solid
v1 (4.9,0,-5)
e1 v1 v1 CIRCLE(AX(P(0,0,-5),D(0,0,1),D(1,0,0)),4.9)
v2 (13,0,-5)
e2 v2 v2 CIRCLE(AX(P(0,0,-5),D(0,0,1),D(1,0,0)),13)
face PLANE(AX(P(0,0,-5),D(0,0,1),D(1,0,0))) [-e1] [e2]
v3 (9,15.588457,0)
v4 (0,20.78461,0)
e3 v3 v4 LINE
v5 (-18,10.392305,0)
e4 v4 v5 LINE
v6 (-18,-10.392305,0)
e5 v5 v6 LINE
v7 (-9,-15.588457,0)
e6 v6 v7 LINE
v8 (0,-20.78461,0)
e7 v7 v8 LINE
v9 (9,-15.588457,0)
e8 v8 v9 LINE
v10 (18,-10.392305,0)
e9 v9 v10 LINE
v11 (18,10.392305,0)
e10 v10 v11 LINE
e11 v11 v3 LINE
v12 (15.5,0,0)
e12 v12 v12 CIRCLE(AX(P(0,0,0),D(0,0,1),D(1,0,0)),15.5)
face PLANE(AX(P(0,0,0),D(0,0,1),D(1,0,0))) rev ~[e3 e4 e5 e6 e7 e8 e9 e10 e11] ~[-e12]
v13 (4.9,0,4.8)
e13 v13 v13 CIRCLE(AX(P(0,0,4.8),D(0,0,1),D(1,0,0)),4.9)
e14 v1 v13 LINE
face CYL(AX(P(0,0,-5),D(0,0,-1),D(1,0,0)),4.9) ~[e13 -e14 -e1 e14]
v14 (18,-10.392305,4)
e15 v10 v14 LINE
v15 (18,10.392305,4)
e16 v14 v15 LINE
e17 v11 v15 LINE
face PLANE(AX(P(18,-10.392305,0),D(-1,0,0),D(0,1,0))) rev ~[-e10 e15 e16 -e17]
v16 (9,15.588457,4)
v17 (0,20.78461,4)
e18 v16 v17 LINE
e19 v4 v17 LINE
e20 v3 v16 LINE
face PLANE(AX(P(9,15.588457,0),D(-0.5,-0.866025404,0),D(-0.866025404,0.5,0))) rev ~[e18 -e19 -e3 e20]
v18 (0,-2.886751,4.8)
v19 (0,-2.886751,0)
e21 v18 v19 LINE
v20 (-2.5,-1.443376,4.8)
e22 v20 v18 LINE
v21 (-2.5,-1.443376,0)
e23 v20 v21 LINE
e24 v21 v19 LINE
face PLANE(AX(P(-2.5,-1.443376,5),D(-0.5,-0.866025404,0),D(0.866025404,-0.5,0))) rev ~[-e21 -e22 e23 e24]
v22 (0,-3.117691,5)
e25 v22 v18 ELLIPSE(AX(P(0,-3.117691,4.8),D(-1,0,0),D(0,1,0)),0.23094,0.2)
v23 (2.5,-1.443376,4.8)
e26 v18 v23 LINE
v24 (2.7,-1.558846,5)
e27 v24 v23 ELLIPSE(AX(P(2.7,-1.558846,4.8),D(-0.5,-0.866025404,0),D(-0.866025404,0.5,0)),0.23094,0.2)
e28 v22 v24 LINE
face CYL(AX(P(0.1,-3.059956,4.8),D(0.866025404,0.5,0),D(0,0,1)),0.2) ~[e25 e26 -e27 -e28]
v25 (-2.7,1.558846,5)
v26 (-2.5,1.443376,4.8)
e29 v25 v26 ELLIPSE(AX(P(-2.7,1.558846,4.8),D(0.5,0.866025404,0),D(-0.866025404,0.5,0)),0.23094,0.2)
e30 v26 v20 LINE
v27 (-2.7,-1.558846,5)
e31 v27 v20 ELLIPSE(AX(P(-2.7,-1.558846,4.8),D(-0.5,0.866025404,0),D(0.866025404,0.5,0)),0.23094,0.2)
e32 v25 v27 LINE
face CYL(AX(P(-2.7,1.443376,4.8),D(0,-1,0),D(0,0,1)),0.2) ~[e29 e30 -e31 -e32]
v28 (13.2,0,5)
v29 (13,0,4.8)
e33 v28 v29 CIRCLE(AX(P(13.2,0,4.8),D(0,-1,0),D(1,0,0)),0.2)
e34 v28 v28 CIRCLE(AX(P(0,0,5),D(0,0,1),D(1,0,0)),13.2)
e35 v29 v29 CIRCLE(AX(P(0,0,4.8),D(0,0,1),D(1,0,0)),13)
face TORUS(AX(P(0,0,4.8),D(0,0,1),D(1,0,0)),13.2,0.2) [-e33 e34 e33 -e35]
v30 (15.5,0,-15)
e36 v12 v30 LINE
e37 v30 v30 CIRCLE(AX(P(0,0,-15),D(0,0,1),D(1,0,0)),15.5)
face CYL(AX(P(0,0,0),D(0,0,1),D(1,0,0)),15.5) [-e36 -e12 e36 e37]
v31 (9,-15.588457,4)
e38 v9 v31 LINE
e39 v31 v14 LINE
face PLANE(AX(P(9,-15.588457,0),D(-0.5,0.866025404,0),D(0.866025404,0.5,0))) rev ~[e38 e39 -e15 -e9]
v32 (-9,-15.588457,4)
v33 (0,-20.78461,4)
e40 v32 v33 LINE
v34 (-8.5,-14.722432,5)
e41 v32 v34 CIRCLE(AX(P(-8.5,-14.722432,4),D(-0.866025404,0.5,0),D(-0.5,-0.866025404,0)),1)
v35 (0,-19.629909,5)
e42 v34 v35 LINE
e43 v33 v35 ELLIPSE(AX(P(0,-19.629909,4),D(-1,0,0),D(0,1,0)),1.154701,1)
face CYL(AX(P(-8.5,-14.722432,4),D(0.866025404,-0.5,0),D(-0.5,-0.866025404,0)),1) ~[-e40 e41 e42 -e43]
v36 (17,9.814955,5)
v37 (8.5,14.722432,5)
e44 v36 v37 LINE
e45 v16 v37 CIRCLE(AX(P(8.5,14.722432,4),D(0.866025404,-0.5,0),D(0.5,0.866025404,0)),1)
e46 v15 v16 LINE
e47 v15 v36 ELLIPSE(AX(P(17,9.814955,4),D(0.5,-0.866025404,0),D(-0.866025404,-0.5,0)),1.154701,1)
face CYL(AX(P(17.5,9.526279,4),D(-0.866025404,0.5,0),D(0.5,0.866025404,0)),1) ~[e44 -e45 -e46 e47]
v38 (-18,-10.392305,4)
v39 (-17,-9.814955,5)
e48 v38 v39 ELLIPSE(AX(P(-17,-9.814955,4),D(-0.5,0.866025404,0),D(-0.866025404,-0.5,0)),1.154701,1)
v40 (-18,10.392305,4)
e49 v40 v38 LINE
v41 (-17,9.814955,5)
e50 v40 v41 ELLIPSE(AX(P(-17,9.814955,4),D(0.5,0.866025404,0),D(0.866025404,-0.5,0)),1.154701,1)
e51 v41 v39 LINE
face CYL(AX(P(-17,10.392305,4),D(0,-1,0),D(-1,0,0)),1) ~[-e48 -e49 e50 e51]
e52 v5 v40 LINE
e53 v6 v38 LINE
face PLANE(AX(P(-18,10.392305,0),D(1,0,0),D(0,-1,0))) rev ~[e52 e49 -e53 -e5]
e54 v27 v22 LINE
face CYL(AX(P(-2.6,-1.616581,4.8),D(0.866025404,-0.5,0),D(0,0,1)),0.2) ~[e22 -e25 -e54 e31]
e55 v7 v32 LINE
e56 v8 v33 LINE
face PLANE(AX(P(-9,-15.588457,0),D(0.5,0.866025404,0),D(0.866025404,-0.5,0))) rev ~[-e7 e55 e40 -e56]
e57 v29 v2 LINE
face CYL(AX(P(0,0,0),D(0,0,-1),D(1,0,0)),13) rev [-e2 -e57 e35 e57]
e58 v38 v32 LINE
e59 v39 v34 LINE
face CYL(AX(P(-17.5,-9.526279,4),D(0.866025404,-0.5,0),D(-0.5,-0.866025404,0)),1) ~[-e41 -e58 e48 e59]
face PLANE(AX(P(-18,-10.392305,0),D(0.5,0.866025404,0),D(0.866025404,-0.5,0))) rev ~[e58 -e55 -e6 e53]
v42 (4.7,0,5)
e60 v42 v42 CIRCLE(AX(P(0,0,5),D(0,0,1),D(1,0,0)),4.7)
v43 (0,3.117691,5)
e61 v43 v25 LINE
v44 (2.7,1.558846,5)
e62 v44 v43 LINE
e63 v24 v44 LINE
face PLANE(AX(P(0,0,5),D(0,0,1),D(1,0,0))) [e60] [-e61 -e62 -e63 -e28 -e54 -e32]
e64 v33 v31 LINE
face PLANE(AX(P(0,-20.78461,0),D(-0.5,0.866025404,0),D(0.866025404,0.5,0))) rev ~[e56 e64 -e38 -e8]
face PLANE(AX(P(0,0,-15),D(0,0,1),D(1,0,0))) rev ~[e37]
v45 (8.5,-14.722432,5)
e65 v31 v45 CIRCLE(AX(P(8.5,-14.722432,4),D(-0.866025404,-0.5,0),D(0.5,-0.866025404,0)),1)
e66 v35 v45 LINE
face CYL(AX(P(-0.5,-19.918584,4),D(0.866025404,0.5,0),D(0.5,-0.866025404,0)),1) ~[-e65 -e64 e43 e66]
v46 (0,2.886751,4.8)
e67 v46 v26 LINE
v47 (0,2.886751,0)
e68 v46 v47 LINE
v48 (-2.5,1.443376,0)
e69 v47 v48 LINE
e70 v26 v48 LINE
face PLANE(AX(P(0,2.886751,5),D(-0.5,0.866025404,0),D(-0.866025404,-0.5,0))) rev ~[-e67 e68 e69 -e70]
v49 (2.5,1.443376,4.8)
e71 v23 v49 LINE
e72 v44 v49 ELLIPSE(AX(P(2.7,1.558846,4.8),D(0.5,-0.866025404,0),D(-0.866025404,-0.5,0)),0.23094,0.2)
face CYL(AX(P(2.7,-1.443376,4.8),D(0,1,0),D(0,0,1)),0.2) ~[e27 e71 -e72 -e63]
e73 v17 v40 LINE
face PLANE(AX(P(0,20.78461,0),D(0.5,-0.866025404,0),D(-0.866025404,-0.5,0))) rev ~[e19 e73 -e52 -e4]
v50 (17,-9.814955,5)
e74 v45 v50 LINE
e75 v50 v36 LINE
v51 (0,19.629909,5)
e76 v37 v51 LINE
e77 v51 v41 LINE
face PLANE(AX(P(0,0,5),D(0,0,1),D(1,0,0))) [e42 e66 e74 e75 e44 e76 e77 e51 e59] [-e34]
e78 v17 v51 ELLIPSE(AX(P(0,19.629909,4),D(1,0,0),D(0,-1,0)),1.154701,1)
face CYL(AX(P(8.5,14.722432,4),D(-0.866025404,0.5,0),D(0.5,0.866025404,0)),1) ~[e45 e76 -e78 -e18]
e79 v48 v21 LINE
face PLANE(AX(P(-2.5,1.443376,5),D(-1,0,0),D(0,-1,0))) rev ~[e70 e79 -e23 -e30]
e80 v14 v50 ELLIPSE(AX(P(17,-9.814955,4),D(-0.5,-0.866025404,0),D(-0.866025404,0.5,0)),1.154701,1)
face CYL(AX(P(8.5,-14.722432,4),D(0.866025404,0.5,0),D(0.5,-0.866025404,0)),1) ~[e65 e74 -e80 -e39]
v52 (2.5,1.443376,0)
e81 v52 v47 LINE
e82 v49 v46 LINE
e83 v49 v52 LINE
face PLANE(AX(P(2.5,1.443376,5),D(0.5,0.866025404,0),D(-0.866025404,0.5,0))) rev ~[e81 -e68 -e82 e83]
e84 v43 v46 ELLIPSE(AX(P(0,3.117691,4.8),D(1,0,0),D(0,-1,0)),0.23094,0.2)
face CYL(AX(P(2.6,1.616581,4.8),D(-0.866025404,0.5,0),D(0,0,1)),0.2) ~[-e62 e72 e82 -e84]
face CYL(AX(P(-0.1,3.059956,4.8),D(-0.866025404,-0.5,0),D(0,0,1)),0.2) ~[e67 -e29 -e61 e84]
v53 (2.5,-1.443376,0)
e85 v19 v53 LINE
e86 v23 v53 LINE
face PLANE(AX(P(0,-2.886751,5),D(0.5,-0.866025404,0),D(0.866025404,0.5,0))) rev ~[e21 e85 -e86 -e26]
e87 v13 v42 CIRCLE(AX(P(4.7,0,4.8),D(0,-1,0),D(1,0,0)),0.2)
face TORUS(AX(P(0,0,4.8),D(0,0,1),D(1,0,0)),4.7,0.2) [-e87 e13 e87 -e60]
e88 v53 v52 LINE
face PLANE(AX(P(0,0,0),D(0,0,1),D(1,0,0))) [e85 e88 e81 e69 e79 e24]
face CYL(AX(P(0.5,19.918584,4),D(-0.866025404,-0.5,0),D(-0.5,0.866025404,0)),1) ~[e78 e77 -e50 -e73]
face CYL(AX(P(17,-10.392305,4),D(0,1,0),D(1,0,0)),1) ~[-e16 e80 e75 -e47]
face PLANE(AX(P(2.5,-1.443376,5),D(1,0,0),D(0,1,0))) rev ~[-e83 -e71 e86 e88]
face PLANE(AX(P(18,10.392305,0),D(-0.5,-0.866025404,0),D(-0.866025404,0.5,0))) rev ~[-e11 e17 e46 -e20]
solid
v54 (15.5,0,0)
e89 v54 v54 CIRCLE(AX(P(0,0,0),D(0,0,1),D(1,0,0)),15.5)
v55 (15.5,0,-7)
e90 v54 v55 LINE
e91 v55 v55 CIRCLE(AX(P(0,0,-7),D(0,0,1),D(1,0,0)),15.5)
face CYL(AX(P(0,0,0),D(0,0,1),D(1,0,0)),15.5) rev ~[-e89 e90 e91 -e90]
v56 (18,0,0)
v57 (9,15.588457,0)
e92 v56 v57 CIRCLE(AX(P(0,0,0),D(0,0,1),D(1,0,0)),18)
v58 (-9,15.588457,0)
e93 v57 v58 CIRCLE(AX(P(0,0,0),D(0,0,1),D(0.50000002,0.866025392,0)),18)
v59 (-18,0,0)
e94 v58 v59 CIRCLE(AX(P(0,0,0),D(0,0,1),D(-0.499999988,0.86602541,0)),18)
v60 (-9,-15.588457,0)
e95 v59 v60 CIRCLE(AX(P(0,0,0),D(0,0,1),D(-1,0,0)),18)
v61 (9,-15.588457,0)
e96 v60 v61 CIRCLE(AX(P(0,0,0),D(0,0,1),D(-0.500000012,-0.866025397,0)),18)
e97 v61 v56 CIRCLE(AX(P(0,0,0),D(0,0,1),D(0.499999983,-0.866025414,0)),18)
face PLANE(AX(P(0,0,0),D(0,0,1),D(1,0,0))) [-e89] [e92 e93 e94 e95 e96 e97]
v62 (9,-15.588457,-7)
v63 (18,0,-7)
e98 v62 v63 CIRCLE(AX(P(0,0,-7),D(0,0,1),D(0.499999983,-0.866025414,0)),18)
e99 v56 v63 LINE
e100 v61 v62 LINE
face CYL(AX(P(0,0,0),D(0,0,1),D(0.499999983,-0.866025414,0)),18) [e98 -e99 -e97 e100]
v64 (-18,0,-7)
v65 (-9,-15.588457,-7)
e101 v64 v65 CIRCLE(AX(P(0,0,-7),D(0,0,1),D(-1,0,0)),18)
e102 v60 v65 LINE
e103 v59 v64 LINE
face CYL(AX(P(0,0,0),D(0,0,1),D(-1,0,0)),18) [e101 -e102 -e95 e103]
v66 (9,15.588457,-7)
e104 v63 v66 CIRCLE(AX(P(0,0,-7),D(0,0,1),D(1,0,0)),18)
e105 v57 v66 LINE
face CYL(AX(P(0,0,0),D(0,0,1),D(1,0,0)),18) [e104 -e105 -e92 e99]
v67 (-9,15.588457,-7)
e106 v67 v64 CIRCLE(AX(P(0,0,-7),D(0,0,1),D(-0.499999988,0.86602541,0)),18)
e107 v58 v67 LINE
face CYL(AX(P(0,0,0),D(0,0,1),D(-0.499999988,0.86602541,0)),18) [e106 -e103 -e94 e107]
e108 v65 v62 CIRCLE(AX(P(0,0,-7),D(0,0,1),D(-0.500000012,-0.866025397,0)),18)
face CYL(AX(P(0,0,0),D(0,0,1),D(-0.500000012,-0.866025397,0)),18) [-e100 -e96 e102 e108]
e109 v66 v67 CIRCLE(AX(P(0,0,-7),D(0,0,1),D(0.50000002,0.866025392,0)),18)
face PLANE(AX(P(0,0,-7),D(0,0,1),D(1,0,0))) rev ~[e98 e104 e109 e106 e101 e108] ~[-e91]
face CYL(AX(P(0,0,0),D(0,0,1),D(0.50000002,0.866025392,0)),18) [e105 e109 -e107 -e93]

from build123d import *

# Parameters (mm, degrees)
F0_R      = 15.5
F0_R_2    = 13
F1_DEPTH  = 5
F2_R      = 1
F3_DEPTH  = 15
F4_DEPTH  = 5
F5_R      = 4.9
F6_DEPTH  = 10
F8_DEPTH  = 5
F9_R      = 0.2
F10_DEPTH = 7


# Not quite as in the source:
# - a feature names something its author has since deleted; it is built from what else it names


with BuildPart() as f1:
    # F0 (on Top) → F1 (new body)
    with BuildSketch(Plane.XY):
        with BuildLine():
            ThreePointArc((8.9999996925, -15.5884574456), (15.5884571794, -9.0000001537), (18, 0))
            ThreePointArc((18, 0), (15.588457371, 8.9999998218), (9.0000003564, 15.5884570623))
            ThreePointArc((9.0000003564, 15.5884570623), (3.256e-07, 18), (-8.9999997925, 15.5884573879))
            ThreePointArc((-8.9999997925, 15.5884573879), (-15.5884572082, 9.0000001038), (-18, 0))
            ThreePointArc((-18, 0), (-15.588457331, -8.9999998911), (-9.0000002178, -15.5884571424))
            ThreePointArc((-9.0000002178, -15.5884571424), (-3.032e-07, -18), (8.9999996925, -15.5884574456))
        make_face()
        Circle(F0_R, mode=Mode.SUBTRACT)
        with BuildLine():
            ThreePointArc((-8.9999997925, 15.5884573879), (3.256e-07, 18), (9.0000003564, 15.5884570623))
            Line((9.0000003564, 15.5884570623), (0, 20.7846096908))
            Line((0, 20.7846096908), (-8.9999997925, 15.5884573879))
        make_face()
        with BuildLine():
            Line((18, 0), (18, 10.3923048454))
            Line((18, 10.3923048454), (9.0000003564, 15.5884570623))
            ThreePointArc((9.0000003564, 15.5884570623), (15.588457371, 8.9999998218), (18, 0))
        make_face()
        with BuildLine():
            ThreePointArc((-18, 0), (-15.5884572082, 9.0000001038), (-8.9999997925, 15.5884573879))
            Line((-8.9999997925, 15.5884573879), (-18, 10.3923048454))
            Line((-18, 10.3923048454), (-18, 0))
        make_face()
        with BuildLine():
            Line((-18, -10.3923048454), (-9.0000002178, -15.5884571424))
            ThreePointArc((-9.0000002178, -15.5884571424), (-15.588457331, -8.9999998911), (-18, 0))
            Line((-18, 0), (-18, -10.3923048454))
        make_face()
        with BuildLine():
            Line((0, -20.7846096908), (8.9999996925, -15.5884574456))
            ThreePointArc((8.9999996925, -15.5884574456), (-3.032e-07, -18), (-9.0000002178, -15.5884571424))
            Line((-9.0000002178, -15.5884571424), (0, -20.7846096908))
        make_face()
        with BuildLine():
            Line((18, -10.3923048454), (18, 0))
            ThreePointArc((18, 0), (15.5884571794, -9.0000001537), (8.9999996925, -15.5884574456))
            Line((8.9999996925, -15.5884574456), (18, -10.3923048454))
        make_face()
        Circle(F0_R)
        Circle(F0_R_2, mode=Mode.SUBTRACT)
    extrude(amount=F1_DEPTH)

    # F2
    f2_edges = [f1.edges().sort_by_distance(p)[0] for p in [
        (-18, 0, 5),
        (-9, 15.588457, 5),
        (9, 15.588457, 5),
        (18, 0, 5),
        (9, -15.588457, 5),
        (-9, -15.588457, 5),
    ]]
    fillet(f2_edges, radius=F2_R)

    # F0 (on Top) → F3 (join)
    with BuildSketch(Plane.XY):
        Circle(F0_R)
        Circle(F0_R_2, mode=Mode.SUBTRACT)
        Circle(F0_R_2)
    extrude(amount=-F3_DEPTH)

    # F0 (on Top) → F4 (cut)
    with BuildSketch(Plane.XY):
        Circle(F0_R_2)
    extrude(amount=-F4_DEPTH, mode=Mode.SUBTRACT)

    # F5 (on face) → F6 (join, through all)
    with BuildSketch(Plane.XY.offset(-5)):
        Circle(F5_R)
    extrude(amount=F6_DEPTH)

    # F7 (on face) → F8 (cut)
    with BuildSketch(Plane.XY.offset(5)):
        Polygon((-2.5, 1.443375673), (-2.5, -1.443375673), (0, -2.8867513459), (2.5, -1.443375673), (2.5, 1.443375673), (0, 2.8867513459), align=None)
    extrude(amount=-F8_DEPTH, mode=Mode.SUBTRACT)

    # F9
    f9_edges = [f1.edges().sort_by_distance(p)[0] for p in [
        (-4.9, 0, 5),
        (-13, 0, 5),
        (-1.25, 2.165064, 5),
        (1.25, 2.165064, 5),
        (2.5, 0, 5),
        (1.25, -2.165064, 5),
        (-1.25, -2.165064, 5),
        (-2.5, 0, 5),
    ]]
    fillet(f9_edges, radius=F9_R)


with BuildPart() as f10:
    # F0 (on Top) → F10 (new body)
    with BuildSketch(Plane.XY):
        with BuildLine():
            ThreePointArc((8.9999996925, -15.5884574456), (15.5884571794, -9.0000001537), (18, 0))
            ThreePointArc((18, 0), (15.588457371, 8.9999998218), (9.0000003564, 15.5884570623))
            ThreePointArc((9.0000003564, 15.5884570623), (3.256e-07, 18), (-8.9999997925, 15.5884573879))
            ThreePointArc((-8.9999997925, 15.5884573879), (-15.5884572082, 9.0000001038), (-18, 0))
            ThreePointArc((-18, 0), (-15.588457331, -8.9999998911), (-9.0000002178, -15.5884571424))
            ThreePointArc((-9.0000002178, -15.5884571424), (-3.032e-07, -18), (8.9999996925, -15.5884574456))
        make_face()
        Circle(F0_R, mode=Mode.SUBTRACT)
    extrude(amount=-F10_DEPTH)


solid = Compound([f1.part, f10.part])
